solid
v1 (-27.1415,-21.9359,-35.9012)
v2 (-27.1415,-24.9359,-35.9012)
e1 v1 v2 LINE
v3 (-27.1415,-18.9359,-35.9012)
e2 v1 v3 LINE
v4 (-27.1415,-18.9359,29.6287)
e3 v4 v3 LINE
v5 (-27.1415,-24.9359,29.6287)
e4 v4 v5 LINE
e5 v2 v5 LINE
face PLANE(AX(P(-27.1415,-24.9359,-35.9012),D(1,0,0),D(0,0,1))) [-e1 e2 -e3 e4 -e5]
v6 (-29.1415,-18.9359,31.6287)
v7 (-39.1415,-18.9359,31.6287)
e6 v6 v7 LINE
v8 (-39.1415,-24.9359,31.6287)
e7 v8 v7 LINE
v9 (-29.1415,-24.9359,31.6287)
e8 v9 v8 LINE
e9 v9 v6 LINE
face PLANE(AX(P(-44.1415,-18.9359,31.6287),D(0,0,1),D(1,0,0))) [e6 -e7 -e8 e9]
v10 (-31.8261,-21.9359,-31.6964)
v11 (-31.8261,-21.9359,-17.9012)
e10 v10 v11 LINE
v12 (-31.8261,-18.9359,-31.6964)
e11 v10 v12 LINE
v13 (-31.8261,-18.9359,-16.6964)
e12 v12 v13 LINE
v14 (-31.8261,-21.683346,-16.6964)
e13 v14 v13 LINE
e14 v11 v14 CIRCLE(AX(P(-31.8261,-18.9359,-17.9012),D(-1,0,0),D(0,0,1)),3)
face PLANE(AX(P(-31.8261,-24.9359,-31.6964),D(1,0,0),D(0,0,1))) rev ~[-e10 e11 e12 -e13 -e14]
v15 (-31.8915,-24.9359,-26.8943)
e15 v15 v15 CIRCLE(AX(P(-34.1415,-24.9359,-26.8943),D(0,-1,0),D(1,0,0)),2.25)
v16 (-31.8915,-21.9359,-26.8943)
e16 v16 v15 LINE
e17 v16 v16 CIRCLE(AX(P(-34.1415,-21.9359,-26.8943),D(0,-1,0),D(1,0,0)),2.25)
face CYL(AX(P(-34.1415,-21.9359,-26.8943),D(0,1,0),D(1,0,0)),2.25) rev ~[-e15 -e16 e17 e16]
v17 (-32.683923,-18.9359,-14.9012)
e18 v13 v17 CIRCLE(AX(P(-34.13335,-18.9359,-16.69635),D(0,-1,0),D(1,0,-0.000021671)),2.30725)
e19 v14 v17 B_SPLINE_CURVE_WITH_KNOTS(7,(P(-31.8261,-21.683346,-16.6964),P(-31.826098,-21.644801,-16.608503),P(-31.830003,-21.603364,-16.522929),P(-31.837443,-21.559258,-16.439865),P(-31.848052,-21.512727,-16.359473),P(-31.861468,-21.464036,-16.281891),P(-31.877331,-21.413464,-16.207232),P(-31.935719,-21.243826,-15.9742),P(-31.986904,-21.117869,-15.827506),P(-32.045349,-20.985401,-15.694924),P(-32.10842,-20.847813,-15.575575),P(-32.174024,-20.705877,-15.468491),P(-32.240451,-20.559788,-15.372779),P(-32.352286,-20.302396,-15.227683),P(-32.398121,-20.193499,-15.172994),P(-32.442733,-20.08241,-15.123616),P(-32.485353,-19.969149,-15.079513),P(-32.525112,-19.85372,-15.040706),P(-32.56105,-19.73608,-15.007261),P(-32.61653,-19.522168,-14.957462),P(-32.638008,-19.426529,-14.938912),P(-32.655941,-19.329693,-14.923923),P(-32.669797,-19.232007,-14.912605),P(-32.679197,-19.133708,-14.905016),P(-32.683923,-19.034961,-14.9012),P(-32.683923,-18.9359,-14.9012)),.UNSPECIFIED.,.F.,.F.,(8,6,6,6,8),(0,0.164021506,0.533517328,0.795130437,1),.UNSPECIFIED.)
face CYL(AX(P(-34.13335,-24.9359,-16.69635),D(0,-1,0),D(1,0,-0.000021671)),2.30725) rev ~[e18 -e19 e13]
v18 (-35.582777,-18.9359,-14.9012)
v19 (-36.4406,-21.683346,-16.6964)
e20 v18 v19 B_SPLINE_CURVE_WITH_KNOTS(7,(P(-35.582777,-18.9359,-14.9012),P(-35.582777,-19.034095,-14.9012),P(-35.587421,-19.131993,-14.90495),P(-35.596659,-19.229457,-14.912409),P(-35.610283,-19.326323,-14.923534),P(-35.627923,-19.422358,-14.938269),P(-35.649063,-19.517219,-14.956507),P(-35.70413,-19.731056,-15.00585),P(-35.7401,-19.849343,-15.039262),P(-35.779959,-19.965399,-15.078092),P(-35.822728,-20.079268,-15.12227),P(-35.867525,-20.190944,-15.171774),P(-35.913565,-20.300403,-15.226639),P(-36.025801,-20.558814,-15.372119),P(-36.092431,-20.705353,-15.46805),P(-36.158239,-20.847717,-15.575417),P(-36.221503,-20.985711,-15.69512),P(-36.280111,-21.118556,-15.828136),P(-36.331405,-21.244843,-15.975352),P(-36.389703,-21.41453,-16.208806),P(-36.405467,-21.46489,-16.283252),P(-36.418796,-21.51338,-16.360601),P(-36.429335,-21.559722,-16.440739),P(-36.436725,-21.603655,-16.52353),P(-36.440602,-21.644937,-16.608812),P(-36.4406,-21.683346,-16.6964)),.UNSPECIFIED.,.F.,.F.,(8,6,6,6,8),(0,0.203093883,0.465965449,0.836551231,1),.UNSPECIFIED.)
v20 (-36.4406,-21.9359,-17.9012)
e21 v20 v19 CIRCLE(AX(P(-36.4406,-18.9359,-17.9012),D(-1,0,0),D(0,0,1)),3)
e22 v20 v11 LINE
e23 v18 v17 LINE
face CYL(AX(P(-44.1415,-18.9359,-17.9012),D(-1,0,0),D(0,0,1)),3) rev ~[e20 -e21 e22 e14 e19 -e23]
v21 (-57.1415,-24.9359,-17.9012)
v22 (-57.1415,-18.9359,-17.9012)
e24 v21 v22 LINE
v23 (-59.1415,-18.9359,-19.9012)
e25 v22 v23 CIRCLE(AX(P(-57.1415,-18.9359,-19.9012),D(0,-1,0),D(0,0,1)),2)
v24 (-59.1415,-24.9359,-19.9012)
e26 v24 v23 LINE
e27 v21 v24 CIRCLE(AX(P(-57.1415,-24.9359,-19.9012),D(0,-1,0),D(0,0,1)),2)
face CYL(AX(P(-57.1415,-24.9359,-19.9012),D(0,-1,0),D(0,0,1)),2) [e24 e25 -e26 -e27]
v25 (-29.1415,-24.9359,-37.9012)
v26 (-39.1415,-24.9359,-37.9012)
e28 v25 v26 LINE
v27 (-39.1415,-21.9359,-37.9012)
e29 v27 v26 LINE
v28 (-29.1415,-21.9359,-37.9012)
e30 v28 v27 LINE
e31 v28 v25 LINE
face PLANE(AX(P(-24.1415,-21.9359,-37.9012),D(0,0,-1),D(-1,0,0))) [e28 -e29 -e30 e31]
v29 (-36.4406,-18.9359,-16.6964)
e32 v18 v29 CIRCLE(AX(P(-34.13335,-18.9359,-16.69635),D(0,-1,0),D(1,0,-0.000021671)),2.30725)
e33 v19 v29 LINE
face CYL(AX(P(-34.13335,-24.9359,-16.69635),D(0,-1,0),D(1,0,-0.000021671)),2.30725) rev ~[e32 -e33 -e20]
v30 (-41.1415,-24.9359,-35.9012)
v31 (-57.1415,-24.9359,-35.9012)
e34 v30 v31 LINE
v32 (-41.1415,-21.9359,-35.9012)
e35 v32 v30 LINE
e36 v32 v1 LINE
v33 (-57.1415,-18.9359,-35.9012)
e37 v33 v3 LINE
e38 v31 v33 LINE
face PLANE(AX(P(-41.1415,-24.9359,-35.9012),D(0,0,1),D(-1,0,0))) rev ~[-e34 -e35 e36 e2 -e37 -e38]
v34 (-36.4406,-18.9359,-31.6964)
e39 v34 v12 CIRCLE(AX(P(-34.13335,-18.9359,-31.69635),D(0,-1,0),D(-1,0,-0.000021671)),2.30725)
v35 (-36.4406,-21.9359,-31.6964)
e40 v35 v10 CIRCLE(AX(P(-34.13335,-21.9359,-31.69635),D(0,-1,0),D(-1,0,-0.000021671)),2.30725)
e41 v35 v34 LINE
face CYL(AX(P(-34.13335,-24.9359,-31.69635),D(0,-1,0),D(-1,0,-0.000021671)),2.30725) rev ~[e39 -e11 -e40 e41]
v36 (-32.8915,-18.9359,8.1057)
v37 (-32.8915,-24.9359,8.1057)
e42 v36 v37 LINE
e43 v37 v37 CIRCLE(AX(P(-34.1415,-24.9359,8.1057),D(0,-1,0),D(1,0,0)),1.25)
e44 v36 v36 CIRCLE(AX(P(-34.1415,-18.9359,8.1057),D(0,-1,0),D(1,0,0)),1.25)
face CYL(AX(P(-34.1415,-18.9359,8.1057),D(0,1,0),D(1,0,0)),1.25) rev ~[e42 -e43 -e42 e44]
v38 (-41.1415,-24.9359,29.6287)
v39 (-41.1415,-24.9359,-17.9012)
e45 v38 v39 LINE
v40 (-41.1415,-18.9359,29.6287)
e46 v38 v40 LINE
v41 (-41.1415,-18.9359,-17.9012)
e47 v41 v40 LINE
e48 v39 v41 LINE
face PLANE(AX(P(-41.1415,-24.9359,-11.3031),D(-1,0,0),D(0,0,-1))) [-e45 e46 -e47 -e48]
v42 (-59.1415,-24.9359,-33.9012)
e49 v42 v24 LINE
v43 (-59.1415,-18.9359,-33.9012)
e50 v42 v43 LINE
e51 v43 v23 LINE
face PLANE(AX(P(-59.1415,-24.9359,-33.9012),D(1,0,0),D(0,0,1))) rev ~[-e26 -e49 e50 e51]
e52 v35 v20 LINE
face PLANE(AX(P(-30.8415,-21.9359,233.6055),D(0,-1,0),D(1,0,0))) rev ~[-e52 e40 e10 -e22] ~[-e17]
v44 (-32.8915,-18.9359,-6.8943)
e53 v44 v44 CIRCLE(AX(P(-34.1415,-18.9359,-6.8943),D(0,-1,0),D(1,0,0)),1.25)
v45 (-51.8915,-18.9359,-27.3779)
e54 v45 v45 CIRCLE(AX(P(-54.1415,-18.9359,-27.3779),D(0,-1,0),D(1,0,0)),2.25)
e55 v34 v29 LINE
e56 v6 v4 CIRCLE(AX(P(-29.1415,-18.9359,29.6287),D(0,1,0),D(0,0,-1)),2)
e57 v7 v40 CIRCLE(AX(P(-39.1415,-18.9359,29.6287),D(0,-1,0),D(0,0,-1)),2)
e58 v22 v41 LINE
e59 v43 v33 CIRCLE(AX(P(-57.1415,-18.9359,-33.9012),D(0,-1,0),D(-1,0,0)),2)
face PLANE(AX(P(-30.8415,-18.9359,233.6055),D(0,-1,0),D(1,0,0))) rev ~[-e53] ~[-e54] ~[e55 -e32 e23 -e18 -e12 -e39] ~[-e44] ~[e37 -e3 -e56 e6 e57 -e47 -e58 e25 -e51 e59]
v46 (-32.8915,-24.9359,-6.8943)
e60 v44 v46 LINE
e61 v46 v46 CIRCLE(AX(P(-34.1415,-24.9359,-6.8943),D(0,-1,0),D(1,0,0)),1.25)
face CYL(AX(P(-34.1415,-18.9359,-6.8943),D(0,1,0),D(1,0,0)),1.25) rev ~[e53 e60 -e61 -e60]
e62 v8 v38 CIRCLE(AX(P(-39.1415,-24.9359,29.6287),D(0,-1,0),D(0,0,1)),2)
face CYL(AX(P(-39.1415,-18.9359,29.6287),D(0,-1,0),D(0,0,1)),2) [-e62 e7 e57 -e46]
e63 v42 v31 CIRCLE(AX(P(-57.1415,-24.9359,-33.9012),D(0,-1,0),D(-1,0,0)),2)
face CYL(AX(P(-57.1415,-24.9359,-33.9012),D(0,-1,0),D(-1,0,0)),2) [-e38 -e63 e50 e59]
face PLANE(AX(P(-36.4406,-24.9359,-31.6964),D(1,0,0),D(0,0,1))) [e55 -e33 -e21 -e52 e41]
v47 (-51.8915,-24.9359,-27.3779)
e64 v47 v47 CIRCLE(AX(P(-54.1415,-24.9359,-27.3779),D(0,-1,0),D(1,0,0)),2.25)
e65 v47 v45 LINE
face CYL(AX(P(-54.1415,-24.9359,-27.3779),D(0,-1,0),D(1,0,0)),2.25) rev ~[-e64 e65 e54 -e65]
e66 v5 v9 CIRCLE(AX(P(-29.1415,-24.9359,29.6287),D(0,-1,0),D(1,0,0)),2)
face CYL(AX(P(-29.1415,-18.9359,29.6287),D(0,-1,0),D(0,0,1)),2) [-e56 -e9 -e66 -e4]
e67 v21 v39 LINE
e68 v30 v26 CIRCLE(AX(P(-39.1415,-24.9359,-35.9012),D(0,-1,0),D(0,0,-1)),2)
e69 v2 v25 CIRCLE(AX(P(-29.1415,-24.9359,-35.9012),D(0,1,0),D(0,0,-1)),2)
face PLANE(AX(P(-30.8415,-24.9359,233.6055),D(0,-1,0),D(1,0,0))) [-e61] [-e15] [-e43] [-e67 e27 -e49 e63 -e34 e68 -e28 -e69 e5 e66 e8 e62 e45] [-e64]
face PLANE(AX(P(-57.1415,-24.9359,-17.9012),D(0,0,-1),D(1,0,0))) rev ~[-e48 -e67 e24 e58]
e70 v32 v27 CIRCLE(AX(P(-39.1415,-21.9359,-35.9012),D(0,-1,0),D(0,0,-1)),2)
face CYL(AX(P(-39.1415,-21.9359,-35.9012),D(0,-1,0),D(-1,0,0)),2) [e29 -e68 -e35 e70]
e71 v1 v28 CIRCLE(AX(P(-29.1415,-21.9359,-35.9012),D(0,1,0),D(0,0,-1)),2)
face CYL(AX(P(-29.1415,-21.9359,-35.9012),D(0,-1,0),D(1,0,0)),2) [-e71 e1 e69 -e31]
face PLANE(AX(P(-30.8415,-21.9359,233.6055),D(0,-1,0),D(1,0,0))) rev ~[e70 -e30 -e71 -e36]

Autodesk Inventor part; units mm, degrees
ref_plane "YZ Plane" through (0, 0, 0) normal (1, 0, 0) x (0, 1, 0)
ref_plane "XZ Plane" through (0, 0, 0) normal (0, 1, 0) x (-1, 0, 0)
ref_plane "XY Plane" through (0, 0, 0) normal (0, 0, 1) x (1, 0, 0)
ref_plane "РабПлоскость1" through (-30.8415, -18.9359, 233.6055) normal (0, -1, 0) x (1, 0, 0)
sketch "Эскиз1" plane through (-30.8415, -18.9359, 233.6055) normal (0, -1, 0) x (1, 0, 0)
  line L0 (-13.3, -2.4998) -> (-13.3, -252.4998) projected
  line L1 (6.7, -2.4998) -> (6.7, -252.4998) projected
  line L2 (-13.3, -201.9768) -> (6.7, -201.9768)
  line L3 (6.7, -201.9768) -> (6.7, -265.9768)
  line L4 (0.7, -271.9768) -> (-7.3, -271.9768)
  line L5 (-13.3, -265.9768) -> (-13.3, -201.9768)
  line L6 (-6.6, -2.4998) -> (-6.6, -252.4998) projected
  line L7 (0, -2.4998) -> (0, -252.4998) projected
  circle A0 centre (-3.3, -240.4998) radius 1.25
  circle A1 centre (-3.3, -225.4998) radius 1.25
  line L8 (-6.2394, -252.4998) -> (-3.6, -252.4998) projected
  arc A2 (-13.3, -265.9768) -> (-7.3, -271.9768) centre (-7.3, -265.9768) ccw
  arc A3 (0.7, -271.9768) -> (6.7, -265.9768) centre (0.7, -265.9768) ccw
  circle A4 centre (-3.3, -260.4999) radius 3.3 projected
  point P0 (30.8415, -233.6055)
  point P1 (-13.3, -271.9768)
  point P2 (-4.9197, -252.4998)
  dimension "d0" = 70
  dimension "d1" = 15
  dimension "d2" = 2.5
  dimension "d3" = 2.5
  dimension "d4" = 3.3
  dimension "d5" = 12
  dimension "d6" = 6
extrude "Выдавливание1" add sketch "Эскиз1" along normal blind 3
sketch "Эскиз2" plane through (-30.8415, -21.9359, 233.6055) normal (0, -1, 0) x (1, 0, 0)
  line L0 (-13.3, -201.9768) -> (-13.3, -265.9768) projected
  line L1 (-13.3, -248.5067) -> (-13.3, -271.9768)
  line L2 (-13.3, -271.9768) -> (6.7, -271.9768)
  line L3 (6.7, -271.9768) -> (6.7, -248.5067)
  line L4 (6.7, -265.9768) -> (6.7, -201.9768) projected
  line L5 (-13.3, -248.5067) -> (6.7, -248.5067)
  point P0 (30.8415, -233.6055)
  point P1 (0.7, -271.9768)
extrude "Выдавливание2" cut sketch "Эскиз2" against normal blind 3
sketch "Эскиз3" plane through (-30.8415, -21.9359, 233.6055) normal (0, -1, 0) x (1, 0, 0)
  line L0 (-13.3, -201.9768) -> (-13.3, -248.5067) projected
  line L1 (-13.3, -244.5067) -> (6.7, -244.5067)
  line L2 (6.7, -244.5067) -> (6.7, -271.5067)
  line L3 (6.7, -271.5067) -> (-13.3, -271.5067)
  line L4 (-13.3, -271.5067) -> (-13.3, -244.5067)
  line L5 (6.7, -248.5067) -> (6.7, -201.9768) projected
  line L6 (-13.3, -248.5067) -> (6.7, -248.5067) projected
  circle A0 centre (-3.3, -260.4998) radius 2.5 projected
  circle A1 centre (-3.3, -260.4998) radius 2.25
  point P0 (30.8415, -233.6055)
  dimension "d11" = 27
  dimension "d12" = 4
  dimension "d22" = 4.5
extrude "Выдавливание3" add sketch "Эскиз3" along normal blind 3 contours L1 L2 L6 L0 | L6 L2 L3 L4 | A0
fillet "Сопряжение1" radius 3 3 edges at (-34.1415, -21.9359, -10.9012) (-34.1415, -21.9359, -14.9012) (-34.1415, -24.9359, -10.9012)
fillet "Сопряжение2" radius 3 4 edges at (-44.1415, -23.4359, -37.9012) (-24.1415, -23.4359, -37.9012) (-44.1415, -20.4359, 31.6287) (-24.1415, -20.4359, 31.6287)
sketch "Эскиз4" plane through (-30.8415, -21.9359, 233.6055) normal (0, -1, 0) x (1, 0, 0)
  arc A0 (3.7, -271.5067) -> (6.7, -268.5067) centre (3.7, -268.5067) ccw projected
  line L0 (3.7, -271.5067) -> (6.7, -271.5067)
  line L1 (6.7, -271.5067) -> (6.7, -201.9768)
  line L2 (6.7, -201.9768) -> (3.7, -201.9768)
  line L3 (3.7, -201.9768) -> (3.7, -271.5067)
  arc A1 (-13.3, -268.5067) -> (-10.3, -271.5067) centre (-10.3, -268.5067) ccw projected
  line L4 (-10.3, -271.5067) -> (-13.3, -271.5067)
  line L5 (-13.3, -271.5067) -> (-13.3, -201.9768)
  line L6 (-13.3, -201.9768) -> (-10.3, -201.9768)
  line L7 (-10.3, -201.9768) -> (-10.3, -271.5067)
  point P0 (30.8415, -233.6055)
  point P1 (-13.3, -268.5067)
  point P2 (6.7, -268.5067)
extrude "Выдавливание4" cut sketch "Эскиз4" along normal blind 10 and the other way blind 5 contours L3 L2 L1 A0 | L5 L6 L7 A1
fillet "Сопряжение3" radius 2 4 edges at (-41.1415, -23.4359, -37.9012) (-27.1415, -23.4359, -37.9012) (-27.1415, -20.4359, 31.6287) (-41.1415, -20.4359, 31.6287)
sketch "Эскиз5" plane through (-30.8415, -24.9359, 233.6055) normal (0, -1, 0) x (1, 0, 0)
  arc A0 (1.7, -271.5067) -> (3.7, -269.5067) centre (1.7, -269.5067) ccw projected
  line L0 (3.7, -269.5067) -> (3.7, -247.5067) projected
  line L1 (-10.3, -247.5067) -> (3.7, -247.5067) projected
  line L2 (-10.3, -247.5067) -> (-10.3, -269.5067) projected
  arc A1 (-10.3, -269.5067) -> (-8.3, -271.5067) centre (-8.3, -269.5067) ccw projected
  line L3 (-8.3, -271.5067) -> (1.7, -271.5067) projected
  circle A2 centre (-3.3, -260.4998) radius 2.25 projected
  arc A3 (-8.3, -201.9768) -> (-10.3, -203.9768) centre (-8.3, -203.9768) ccw projected
  line L4 (-10.3, -203.9768) -> (-10.3, -242.3106) projected
  line L5 (3.7, -242.3106) -> (-10.3, -242.3106) projected
  line L6 (3.7, -242.3106) -> (3.7, -203.9768) projected
  arc A4 (3.7, -203.9768) -> (1.7, -201.9768) centre (1.7, -203.9768) ccw projected
  line L7 (1.7, -201.9768) -> (-8.3, -201.9768) projected
  circle A5 centre (-3.3, -225.4998) radius 1.25 projected
  circle A6 centre (-3.3, -240.4998) radius 1.25 projected
  line L8 (-10.3, -242.3106) -> (-10.3, -244.9086) projected
  line L9 (-10.3, -244.9086) -> (3.7, -244.9086) projected
  line L10 (3.7, -244.9086) -> (3.7, -242.3106) projected
  line L11 (3.7, -242.3106) -> (-10.3, -242.3106) projected
  line L12 (-10.3, -244.9086) -> (-10.3, -247.5067) projected
  line L13 (-10.3, -247.5067) -> (3.7, -247.5067) projected
  line L14 (3.7, -247.5067) -> (3.7, -244.9086) projected
  line L15 (-10.3, -244.9086) -> (3.7, -244.9086) projected
  point P0 (30.8415, -233.6055)
sketch "Эскиз6" plane through (-30.8415, -24.9359, 233.6055) normal (0, -1, 0) x (1, 0, 0)
  line L0 (-10.3, -269.5067) -> (-26.3, -269.5067)
  circle A0 centre (-23.3, -260.9834) radius 2.25
  line L1 (3.7, -269.5067) -> (3.7, -247.5067) projected
  line L2 (3.7, -244.9086) -> (3.7, -247.5067) projected
  line L3 (3.7, -244.9086) -> (3.7, -242.3106) projected
  line L4 (3.7, -242.3106) -> (3.7, -203.9768) projected
  arc A1 (3.7, -203.9768) -> (1.7, -201.9768) centre (1.7, -203.9768) ccw projected
  line L5 (1.7, -201.9768) -> (-8.3, -201.9768) projected
  arc A2 (-8.3, -201.9768) -> (-10.3, -203.9768) centre (-8.3, -203.9768) ccw projected
  line L6 (-10.3, -203.9768) -> (-10.3, -242.3106) projected
  line L7 (-10.3, -242.3106) -> (-10.3, -244.9086) projected
  line L8 (-28.3, -267.5067) -> (-28.3, -253.5067)
  line L9 (-26.3, -251.5067) -> (-10.3, -251.5067)
  line L10 (-10.3, -244.9086) -> (-10.3, -251.5067)
  circle A3 centre (-3.3, -240.4998) radius 1.25 projected
  circle A4 centre (-3.3, -225.4998) radius 1.25 projected
  arc A5 (-28.3, -267.5067) -> (-26.3, -269.5067) centre (-26.3, -267.5067) ccw
  arc A6 (-26.3, -251.5067) -> (-28.3, -253.5067) centre (-26.3, -253.5067) ccw
  line L11 (3.7, -251.5067) -> (3.7, -269.5067) projected
  line L12 (-10.3, -269.5067) -> (3.7, -269.5067)
  line L13 (-5.5991, -265.3019) -> (-5.5991, -250.3019)
  line L14 (-0.9846, -265.3019) -> (-0.9846, -250.3019)
  arc A7 (-5.5991, -265.3019) -> (-0.9846, -265.3019) centre (-3.2919, -265.3019) ccw
  arc A8 (-0.9846, -250.3019) -> (-5.5991, -250.3019) centre (-3.2919, -250.3019) ccw
  circle A9 centre (-3.3, -260.4998) radius 2.25 projected
  point P0 (30.8415, -233.6055)
  point P1 (-28.3, -269.5067)
  point P2 (-18.3, -251.5067)
  dimension "d23" = 20
  dimension "d24" = 18
  dimension "d25" = 18
  dimension "d26" = 2
  dimension "d27" = 15
extrude "Выдавливание5" add sketch "Эскиз6" against normal blind 6 contours L0 A5 L8 A6 L9 L10 L7 L6 A2 L5 A1 L4 L3 L2 L1 L12
properties part number "крепление шкива боковое"
